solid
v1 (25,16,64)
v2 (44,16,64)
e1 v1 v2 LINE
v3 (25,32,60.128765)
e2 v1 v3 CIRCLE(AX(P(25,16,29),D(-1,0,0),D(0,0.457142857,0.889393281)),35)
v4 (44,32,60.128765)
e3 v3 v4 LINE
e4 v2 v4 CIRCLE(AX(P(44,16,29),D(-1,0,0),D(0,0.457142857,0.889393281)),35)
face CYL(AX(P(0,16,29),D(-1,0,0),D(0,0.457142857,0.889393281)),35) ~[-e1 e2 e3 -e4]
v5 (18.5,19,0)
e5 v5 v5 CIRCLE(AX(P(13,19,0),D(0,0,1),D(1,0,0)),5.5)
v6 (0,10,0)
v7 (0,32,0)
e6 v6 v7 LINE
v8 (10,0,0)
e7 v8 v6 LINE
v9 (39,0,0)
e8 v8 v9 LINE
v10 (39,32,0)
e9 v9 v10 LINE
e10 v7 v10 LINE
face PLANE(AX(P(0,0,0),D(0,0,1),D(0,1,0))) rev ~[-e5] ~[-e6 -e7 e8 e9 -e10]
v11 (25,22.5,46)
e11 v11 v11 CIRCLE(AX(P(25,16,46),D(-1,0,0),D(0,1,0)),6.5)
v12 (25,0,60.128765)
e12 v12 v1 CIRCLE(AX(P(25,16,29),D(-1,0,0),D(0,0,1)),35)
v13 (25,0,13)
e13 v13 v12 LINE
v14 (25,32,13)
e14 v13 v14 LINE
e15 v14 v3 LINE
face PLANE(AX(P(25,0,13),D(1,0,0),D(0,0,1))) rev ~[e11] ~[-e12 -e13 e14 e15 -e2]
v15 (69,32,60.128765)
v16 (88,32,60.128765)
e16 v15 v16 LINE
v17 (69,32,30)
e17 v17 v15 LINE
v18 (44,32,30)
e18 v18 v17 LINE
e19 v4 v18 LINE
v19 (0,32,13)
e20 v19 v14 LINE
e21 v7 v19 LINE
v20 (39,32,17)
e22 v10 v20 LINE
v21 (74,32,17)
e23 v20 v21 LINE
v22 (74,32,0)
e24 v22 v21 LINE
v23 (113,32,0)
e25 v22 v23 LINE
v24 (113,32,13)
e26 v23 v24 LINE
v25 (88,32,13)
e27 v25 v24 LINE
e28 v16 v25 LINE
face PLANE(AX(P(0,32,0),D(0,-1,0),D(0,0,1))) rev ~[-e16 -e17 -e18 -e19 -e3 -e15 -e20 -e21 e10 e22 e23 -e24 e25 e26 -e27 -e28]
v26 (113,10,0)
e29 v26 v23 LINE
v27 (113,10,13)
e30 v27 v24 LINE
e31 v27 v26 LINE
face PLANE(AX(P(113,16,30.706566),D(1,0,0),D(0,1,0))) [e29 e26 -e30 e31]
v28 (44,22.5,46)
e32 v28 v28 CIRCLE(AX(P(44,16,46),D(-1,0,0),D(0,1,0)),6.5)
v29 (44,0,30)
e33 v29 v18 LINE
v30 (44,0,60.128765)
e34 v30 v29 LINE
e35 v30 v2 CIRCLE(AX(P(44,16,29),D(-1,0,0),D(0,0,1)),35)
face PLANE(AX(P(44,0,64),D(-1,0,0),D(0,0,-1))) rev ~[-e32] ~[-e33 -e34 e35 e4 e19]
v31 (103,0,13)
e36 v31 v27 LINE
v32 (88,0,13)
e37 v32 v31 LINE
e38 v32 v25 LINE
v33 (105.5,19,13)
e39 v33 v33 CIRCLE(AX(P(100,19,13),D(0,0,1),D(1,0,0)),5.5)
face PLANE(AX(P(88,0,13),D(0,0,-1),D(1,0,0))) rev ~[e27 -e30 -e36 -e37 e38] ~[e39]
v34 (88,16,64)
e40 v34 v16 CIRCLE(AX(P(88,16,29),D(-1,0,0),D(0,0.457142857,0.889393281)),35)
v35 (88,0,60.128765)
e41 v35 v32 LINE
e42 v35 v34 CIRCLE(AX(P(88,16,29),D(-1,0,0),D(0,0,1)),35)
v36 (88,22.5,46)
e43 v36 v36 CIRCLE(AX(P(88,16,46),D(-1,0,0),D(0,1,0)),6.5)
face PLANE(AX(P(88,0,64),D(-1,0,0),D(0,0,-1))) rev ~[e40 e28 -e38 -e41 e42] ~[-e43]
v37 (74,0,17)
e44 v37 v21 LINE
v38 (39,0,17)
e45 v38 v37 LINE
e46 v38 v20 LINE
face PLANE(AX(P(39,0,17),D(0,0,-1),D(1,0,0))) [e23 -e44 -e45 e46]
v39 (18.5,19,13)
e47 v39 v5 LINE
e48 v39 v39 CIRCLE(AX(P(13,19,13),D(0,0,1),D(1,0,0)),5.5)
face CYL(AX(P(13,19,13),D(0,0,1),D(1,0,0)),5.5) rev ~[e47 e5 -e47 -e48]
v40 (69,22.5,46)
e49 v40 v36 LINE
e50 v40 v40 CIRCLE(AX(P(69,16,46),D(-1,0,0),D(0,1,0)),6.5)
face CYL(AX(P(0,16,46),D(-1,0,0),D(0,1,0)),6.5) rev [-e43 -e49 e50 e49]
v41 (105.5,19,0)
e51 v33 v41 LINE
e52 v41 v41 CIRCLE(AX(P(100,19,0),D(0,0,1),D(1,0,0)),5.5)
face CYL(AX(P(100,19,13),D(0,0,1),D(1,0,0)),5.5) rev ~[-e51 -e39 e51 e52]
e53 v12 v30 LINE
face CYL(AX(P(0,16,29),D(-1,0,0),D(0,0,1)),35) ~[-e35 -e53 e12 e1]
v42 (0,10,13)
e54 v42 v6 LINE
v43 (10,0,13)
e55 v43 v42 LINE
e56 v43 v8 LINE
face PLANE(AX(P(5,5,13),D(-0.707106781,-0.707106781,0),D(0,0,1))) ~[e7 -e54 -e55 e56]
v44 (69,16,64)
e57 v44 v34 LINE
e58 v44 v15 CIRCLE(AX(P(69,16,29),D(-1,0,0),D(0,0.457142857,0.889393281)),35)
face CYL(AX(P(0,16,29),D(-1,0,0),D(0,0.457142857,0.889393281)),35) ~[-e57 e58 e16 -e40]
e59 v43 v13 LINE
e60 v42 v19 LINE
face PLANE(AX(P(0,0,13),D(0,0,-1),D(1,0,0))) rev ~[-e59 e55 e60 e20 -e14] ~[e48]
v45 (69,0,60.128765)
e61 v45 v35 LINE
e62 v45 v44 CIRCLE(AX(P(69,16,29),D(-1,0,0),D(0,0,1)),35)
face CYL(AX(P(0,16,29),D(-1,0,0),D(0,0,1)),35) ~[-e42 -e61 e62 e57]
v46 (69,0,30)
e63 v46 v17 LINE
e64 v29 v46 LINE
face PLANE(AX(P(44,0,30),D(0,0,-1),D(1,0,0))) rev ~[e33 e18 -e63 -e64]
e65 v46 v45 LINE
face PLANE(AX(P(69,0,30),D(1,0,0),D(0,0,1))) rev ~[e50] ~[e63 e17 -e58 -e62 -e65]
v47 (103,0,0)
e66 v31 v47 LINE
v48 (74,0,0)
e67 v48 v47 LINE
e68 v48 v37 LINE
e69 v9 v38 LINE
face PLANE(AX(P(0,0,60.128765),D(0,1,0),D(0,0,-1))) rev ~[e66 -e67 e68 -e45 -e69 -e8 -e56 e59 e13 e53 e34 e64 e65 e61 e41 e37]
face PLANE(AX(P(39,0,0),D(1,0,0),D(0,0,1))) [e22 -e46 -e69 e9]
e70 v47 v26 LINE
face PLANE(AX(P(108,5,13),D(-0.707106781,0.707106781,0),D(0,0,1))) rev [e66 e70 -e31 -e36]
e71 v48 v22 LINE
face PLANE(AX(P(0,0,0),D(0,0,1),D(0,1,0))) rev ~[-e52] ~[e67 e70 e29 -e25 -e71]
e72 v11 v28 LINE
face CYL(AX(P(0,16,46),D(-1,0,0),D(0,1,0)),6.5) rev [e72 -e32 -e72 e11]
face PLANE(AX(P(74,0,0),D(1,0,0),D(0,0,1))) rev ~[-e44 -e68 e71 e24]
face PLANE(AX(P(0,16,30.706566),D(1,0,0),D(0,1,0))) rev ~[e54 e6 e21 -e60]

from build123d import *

# Parameters (mm, degrees)
F0_R     = 6.5
F1_DEPTH = 113
F2_W     = 25
F2_H     = 47.1287648325
F2_W_2   = 35
F2_H_2   = 17
F2_H_3   = 30.1287648325
F2_H_4   = 3.8712351675
F3_DEPTH = 32.001
F4_R     = 5.5
F5_DEPTH = 13.001
F6_SIZE  = 10


# Not quite as in the source:
# - a feature names something its author has since deleted; it is built from what else it names


with BuildPart() as f1:
    # F0 (on Right) → F1 (new body)
    with BuildSketch(Plane.YZ):
        with BuildLine():
            Line((0, 60.1287648325), (0, 0))
            Line((0, 0), (32, 0))
            Line((32, 0), (32, 60.1287648325))
            ThreePointArc((32, 60.1287648325), (24.2308332161, 63.0184271325), (16, 64))
            ThreePointArc((16, 64), (7.769166784, 63.0184271325), (0, 60.1287648325))
        make_face()
        with Locations((16, 46)):
            Circle(F0_R, mode=Mode.SUBTRACT)
    extrude(amount=F1_DEPTH)

    # F2 (on face) → F3 (cut, through all)
    with BuildSketch(Plane.XZ):
        with Locations((12.5, 36.5643824163)):
            Rectangle(F2_W, F2_H)
        with Locations((56.5, 8.5)):
            Rectangle(F2_W_2, F2_H_2)
        with Locations((100.5, 36.5643824163)):
            Rectangle(F2_W, F2_H)
        with Locations((56.5, 45.0643824163)):
            Rectangle(F2_W, F2_H_3)
        with Locations((12.5, 62.0643824163)):
            Rectangle(F2_W, F2_H_4)
        with Locations((56.5, 62.0643824163)):
            Rectangle(F2_W, F2_H_4)
        with Locations((100.5, 62.0643824163)):
            Rectangle(F2_W, F2_H_4)
    extrude(amount=-F3_DEPTH, mode=Mode.SUBTRACT)

    # F4 (on face) → F5 (cut, through all)
    with BuildSketch(Plane.XY.offset(13)):
        with Locations((100, 19)):
            Circle(F4_R)
        with Locations((13, 19)):
            Circle(F4_R)
    extrude(amount=-F5_DEPTH, mode=Mode.SUBTRACT)

    # F6
    f6_edges = [f1.edges().sort_by_distance(p)[0] for p in [
        (0, 0, 6.5),
        (113, 0, 6.5),
    ]]
    chamfer(f6_edges, length=F6_SIZE)


solid = f1.part
